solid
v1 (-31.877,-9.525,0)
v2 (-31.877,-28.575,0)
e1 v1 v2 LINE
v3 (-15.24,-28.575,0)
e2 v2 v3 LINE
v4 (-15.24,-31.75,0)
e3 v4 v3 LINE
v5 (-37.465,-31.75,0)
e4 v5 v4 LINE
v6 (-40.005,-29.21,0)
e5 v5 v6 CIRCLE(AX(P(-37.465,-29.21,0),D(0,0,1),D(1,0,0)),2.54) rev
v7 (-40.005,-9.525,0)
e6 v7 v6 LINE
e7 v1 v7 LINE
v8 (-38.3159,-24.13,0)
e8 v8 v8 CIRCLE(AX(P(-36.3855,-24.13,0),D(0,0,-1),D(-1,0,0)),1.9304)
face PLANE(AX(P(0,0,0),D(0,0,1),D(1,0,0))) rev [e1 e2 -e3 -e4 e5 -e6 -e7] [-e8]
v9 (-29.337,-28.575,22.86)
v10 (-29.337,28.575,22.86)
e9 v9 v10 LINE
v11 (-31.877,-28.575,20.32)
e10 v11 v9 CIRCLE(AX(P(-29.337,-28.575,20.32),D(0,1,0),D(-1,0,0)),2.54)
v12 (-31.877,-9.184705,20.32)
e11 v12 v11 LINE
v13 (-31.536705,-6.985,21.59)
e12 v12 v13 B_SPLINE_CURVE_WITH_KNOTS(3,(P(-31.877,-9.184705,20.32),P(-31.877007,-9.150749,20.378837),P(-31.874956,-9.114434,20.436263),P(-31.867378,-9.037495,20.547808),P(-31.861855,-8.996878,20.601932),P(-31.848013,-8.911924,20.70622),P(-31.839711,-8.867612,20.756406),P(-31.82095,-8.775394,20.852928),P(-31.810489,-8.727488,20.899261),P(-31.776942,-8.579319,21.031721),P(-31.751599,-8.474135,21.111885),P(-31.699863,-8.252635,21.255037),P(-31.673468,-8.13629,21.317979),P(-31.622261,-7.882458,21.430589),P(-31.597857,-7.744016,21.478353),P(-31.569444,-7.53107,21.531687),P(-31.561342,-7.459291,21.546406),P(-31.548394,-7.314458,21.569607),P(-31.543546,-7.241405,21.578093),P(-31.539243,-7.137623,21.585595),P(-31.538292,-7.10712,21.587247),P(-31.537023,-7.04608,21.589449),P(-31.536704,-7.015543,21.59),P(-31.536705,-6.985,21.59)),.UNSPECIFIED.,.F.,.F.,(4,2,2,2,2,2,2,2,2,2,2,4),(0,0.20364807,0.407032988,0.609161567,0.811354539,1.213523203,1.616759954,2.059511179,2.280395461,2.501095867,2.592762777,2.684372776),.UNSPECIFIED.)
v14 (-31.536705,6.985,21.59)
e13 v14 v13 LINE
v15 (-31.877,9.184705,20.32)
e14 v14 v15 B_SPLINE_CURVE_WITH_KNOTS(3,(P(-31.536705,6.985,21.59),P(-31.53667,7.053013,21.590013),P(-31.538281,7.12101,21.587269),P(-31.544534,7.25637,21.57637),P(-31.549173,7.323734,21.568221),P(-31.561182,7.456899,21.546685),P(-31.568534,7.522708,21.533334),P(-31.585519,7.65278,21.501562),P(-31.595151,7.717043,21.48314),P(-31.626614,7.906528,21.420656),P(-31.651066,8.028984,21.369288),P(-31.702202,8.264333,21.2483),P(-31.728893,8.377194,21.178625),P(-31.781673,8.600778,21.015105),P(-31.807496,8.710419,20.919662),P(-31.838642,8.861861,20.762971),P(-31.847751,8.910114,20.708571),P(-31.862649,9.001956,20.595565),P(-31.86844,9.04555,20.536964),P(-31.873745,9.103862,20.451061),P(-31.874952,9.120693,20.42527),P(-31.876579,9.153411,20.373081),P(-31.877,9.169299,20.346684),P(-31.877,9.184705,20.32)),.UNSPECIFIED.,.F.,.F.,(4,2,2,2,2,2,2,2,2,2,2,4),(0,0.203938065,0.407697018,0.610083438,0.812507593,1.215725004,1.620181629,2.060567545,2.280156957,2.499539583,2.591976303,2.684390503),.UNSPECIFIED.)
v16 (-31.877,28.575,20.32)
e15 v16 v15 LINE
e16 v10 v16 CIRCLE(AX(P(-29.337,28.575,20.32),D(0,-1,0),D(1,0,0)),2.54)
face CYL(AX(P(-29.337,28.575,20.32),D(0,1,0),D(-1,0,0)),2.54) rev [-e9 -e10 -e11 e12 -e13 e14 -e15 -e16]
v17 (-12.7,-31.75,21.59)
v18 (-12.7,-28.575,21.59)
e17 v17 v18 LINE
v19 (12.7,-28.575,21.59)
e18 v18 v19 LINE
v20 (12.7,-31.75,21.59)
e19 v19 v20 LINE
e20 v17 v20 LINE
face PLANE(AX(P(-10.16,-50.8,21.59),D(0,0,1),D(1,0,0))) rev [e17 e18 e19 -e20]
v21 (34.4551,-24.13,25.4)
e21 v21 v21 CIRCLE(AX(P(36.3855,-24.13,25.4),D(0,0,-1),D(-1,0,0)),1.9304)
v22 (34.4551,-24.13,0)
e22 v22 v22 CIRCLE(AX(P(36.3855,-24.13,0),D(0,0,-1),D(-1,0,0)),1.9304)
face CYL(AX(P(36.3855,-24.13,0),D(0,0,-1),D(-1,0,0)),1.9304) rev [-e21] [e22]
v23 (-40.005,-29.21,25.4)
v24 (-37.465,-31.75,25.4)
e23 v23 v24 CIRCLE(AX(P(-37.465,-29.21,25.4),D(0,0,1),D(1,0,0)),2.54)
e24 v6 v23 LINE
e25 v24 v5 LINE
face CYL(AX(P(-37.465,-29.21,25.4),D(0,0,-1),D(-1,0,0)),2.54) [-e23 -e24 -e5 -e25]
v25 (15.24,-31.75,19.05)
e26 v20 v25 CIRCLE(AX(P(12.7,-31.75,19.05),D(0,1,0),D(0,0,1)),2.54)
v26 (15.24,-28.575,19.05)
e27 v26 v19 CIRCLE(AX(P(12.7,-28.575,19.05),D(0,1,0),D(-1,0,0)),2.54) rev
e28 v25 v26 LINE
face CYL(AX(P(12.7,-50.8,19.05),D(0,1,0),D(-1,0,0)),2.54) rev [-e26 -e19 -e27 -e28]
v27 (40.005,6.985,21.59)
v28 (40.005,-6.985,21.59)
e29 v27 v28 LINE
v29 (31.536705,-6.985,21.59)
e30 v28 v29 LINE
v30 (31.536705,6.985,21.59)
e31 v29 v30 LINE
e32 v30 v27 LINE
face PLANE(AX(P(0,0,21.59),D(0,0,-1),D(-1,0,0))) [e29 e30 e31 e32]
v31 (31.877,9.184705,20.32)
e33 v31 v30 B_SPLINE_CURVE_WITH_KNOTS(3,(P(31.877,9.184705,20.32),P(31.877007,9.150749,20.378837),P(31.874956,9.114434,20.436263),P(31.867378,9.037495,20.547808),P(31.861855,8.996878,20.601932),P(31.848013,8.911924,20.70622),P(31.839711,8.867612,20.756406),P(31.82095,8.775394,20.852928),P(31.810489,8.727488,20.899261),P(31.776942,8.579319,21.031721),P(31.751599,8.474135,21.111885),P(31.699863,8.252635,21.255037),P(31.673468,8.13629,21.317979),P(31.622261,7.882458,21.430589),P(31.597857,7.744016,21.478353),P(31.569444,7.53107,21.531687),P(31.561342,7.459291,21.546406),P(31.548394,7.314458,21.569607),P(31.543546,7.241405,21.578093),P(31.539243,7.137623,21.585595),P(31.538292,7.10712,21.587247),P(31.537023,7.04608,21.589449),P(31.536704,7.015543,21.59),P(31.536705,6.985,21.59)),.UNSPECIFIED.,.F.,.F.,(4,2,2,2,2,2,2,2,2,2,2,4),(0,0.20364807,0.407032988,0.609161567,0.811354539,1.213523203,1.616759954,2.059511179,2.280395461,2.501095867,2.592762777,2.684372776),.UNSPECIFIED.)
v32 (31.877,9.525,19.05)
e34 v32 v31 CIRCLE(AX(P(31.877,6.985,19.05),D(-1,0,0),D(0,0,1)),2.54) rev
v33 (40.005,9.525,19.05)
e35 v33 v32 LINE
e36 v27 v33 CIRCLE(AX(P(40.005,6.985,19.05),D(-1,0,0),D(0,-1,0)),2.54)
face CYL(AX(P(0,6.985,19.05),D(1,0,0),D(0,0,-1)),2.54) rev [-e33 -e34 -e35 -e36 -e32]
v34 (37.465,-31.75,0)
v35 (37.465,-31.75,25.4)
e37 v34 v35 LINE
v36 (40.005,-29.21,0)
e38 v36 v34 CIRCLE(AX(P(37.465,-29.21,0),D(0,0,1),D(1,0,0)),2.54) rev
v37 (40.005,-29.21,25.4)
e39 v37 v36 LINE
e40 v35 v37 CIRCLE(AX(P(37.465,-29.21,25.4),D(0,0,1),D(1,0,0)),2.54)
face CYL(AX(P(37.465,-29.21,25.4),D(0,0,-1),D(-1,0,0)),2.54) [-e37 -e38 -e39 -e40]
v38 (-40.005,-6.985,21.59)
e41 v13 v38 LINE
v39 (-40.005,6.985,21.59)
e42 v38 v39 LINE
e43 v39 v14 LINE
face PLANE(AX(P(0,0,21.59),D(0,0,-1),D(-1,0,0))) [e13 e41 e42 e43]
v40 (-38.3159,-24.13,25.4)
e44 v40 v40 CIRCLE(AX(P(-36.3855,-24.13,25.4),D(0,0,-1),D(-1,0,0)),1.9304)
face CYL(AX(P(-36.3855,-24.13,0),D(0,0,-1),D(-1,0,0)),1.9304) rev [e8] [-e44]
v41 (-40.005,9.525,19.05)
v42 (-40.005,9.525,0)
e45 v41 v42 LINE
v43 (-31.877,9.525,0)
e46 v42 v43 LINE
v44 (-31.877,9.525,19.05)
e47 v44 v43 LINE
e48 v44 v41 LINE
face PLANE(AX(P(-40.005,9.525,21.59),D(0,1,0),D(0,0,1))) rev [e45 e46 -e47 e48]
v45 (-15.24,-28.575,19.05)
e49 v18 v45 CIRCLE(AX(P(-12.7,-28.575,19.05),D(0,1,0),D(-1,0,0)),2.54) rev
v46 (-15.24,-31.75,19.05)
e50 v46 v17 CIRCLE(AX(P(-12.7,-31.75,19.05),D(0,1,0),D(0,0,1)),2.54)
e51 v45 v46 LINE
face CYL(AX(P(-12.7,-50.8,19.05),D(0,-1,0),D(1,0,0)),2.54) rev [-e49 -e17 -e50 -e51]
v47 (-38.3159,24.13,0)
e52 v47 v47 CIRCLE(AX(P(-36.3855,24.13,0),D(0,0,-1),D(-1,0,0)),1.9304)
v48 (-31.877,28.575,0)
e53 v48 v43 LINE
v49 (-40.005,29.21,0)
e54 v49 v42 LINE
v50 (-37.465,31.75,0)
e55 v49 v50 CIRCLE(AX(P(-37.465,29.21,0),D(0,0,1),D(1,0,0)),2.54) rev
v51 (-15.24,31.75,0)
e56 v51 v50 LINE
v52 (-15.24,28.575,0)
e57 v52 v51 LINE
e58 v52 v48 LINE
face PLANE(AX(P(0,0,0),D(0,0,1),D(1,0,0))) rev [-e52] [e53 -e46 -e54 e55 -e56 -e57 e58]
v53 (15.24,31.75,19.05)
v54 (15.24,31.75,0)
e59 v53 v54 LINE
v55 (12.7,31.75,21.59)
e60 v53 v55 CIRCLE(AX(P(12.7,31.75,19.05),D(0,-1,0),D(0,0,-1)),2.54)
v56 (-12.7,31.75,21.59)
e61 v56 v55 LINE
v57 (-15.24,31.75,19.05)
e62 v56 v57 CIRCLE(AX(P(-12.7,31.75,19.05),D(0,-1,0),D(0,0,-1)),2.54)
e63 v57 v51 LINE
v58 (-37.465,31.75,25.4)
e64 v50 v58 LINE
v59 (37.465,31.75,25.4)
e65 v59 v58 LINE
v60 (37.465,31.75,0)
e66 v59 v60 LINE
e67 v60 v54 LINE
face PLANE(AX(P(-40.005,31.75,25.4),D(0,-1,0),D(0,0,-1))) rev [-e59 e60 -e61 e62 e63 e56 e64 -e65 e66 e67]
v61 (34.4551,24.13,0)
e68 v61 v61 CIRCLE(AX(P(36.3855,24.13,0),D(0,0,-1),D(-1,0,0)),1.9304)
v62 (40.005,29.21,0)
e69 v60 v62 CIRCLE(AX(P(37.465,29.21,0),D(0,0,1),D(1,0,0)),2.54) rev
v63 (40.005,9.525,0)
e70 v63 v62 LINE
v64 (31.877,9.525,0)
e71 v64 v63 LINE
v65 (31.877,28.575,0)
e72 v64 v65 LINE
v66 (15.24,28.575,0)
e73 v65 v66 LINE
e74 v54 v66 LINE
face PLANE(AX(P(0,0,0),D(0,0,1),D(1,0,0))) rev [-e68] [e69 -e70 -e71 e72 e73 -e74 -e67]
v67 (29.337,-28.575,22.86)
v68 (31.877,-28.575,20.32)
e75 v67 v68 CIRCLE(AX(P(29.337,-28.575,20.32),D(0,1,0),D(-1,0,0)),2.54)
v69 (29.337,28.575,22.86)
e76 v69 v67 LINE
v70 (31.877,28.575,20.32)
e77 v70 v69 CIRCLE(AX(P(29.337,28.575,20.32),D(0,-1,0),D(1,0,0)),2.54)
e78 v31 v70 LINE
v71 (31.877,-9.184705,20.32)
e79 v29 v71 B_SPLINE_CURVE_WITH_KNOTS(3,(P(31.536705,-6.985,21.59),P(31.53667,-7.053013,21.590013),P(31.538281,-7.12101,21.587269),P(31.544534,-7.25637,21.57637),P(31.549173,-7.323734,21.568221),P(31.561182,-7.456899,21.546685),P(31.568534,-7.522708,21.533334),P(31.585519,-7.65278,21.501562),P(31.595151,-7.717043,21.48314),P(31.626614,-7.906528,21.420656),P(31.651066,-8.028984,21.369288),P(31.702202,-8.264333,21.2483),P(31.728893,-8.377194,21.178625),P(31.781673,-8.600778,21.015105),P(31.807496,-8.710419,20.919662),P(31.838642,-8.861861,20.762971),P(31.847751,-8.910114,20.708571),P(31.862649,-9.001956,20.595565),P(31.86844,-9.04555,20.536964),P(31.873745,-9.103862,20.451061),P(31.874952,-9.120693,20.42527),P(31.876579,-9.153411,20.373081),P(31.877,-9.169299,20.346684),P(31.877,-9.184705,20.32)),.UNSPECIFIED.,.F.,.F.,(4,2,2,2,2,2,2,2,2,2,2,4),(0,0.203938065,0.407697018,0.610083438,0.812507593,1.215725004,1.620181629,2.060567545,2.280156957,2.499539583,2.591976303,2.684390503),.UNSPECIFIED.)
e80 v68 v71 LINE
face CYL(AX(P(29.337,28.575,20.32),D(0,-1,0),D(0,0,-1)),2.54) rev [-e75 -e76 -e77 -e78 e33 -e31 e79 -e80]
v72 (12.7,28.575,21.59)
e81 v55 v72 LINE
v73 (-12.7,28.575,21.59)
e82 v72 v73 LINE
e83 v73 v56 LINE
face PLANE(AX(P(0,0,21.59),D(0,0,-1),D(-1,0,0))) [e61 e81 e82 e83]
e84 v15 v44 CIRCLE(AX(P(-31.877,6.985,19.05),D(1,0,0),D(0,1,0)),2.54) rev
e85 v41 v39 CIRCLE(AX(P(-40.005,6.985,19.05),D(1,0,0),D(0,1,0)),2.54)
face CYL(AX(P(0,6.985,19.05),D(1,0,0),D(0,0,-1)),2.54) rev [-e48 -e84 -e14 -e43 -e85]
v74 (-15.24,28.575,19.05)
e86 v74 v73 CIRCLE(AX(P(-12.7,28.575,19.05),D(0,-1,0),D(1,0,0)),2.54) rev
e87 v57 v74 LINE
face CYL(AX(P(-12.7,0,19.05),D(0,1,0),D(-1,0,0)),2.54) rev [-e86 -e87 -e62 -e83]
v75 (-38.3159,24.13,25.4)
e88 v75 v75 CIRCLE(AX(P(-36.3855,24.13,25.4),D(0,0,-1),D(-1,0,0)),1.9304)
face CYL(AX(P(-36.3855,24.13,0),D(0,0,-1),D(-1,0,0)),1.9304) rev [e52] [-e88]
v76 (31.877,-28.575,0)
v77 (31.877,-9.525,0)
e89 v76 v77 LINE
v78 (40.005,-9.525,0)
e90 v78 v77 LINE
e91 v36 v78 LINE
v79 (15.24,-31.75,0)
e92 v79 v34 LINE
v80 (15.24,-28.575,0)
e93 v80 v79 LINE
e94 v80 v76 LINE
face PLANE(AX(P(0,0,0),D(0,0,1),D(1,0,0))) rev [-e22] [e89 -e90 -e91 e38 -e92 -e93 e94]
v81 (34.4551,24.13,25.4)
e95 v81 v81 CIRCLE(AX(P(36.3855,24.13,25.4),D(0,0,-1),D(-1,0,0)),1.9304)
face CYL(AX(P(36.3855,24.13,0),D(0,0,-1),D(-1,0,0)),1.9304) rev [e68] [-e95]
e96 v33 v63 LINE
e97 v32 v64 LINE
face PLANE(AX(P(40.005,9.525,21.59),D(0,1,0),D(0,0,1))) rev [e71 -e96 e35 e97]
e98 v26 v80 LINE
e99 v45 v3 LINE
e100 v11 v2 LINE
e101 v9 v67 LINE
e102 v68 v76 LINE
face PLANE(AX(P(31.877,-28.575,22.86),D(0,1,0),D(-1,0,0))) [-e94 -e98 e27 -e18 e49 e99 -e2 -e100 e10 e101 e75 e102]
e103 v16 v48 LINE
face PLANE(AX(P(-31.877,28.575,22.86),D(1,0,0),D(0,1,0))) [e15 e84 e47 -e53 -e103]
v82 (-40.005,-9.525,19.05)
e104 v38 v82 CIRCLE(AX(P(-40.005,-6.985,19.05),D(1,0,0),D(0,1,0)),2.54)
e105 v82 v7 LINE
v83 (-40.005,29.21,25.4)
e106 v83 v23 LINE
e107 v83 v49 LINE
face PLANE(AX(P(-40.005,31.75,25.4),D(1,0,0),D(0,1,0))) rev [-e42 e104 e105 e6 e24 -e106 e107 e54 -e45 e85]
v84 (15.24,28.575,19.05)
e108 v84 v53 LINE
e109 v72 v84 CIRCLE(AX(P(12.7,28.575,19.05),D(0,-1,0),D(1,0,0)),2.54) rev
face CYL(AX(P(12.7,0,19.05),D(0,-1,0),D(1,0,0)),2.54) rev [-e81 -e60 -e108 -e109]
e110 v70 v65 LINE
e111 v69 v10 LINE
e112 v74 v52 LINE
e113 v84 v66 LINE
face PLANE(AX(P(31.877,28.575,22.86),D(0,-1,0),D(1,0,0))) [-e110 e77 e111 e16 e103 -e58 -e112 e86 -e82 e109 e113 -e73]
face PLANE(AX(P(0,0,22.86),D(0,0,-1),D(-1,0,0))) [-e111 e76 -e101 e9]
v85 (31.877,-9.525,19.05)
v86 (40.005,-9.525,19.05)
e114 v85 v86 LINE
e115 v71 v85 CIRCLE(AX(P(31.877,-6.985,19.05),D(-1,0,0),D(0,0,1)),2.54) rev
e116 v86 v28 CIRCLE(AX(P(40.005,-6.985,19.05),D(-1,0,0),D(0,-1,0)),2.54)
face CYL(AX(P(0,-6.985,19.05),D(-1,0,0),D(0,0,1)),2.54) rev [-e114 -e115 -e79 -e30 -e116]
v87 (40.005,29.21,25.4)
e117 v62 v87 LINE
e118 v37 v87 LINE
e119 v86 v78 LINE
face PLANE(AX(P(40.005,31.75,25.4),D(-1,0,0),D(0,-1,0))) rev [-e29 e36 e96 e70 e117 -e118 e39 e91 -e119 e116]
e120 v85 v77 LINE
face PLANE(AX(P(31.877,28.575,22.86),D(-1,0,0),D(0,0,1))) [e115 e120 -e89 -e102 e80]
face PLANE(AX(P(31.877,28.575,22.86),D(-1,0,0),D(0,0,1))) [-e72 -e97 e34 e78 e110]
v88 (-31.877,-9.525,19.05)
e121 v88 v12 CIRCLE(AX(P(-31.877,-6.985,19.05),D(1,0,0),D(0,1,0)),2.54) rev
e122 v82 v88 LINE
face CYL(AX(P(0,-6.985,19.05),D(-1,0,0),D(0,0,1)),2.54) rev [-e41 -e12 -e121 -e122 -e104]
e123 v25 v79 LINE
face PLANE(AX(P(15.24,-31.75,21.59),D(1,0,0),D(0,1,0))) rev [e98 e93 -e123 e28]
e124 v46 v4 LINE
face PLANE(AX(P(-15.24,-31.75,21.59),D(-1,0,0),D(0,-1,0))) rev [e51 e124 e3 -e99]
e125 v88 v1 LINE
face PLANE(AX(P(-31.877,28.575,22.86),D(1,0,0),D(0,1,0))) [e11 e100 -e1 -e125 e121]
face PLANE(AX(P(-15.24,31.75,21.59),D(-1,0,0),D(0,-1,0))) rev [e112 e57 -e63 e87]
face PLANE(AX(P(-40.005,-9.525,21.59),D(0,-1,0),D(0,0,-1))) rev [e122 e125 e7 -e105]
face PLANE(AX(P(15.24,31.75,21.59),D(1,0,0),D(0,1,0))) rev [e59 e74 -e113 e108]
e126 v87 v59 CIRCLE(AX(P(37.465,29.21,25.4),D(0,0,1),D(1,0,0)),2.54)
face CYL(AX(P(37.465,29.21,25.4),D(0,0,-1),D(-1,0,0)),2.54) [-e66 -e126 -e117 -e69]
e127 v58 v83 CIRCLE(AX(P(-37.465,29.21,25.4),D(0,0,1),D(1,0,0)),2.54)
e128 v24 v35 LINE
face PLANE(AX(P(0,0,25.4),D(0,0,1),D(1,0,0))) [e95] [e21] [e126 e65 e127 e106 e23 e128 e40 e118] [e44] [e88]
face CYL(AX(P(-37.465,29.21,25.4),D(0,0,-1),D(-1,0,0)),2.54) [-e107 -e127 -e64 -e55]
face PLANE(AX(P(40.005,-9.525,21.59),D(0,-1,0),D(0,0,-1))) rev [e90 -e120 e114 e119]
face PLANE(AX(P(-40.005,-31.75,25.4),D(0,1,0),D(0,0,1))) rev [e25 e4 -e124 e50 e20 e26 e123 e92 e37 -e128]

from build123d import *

# Parameters (mm, degrees)
SKETCH1_W             = 80.01
SKETCH1_H             = 63.5
BOSS_EXTRUDE1_DEPTH   = 25.4
SKETCH2_W             = 63.754
SKETCH2_H             = 57.15
CUT_EXTRUDE1_DEPTH    = 22.86
F_8_CLEARANCE_HOLE1_D = 3.8608
SKETCH13_W            = 20.32
SKETCH13_H            = 21.59
CUT_EXTRUDE3_DEPTH    = 50.8
SKETCH14_W            = 8.128
SKETCH14_H            = 19.05
CUT_EXTRUDE4_DEPTH    = 21.59
SKETCH15_W            = 30.48
SKETCH15_H            = 3.175
CUT_EXTRUDE5_DEPTH    = 21.59
FILLET1_R             = 2.54
FILLET2_R             = 2.54
FILLET3_R             = 2.54


with BuildPart() as part:
    # Sketch1 → Boss-Extrude1 (new body)
    with BuildSketch(Plane.XY):
        Rectangle(SKETCH1_W, SKETCH1_H)
    extrude(amount=BOSS_EXTRUDE1_DEPTH)

    # Sketch2 → Cut-Extrude1 (cut)
    with BuildSketch(Plane.XY):
        Rectangle(SKETCH2_W, SKETCH2_H)
    extrude(amount=CUT_EXTRUDE1_DEPTH, mode=Mode.SUBTRACT)

    # #8 Clearance Hole1 (through all)
    with Locations(Plane(origin=(0, 0, 0), x_dir=(-1, 0, 0), z_dir=(0, 0, -1))):
        with Locations((-36.3855, -24.13), (-36.3855, 24.13), (36.3855, 24.13), (36.3855, -24.13)):
            Hole(F_8_CLEARANCE_HOLE1_D / 2)

    # Sketch13 → Cut-Extrude3 (cut)
    with BuildSketch(Plane(origin=(0, 0, 0), x_dir=(1, 0, 0), z_dir=(0, 1, 0))):
        with Locations((0, -10.795)):
            Rectangle(SKETCH13_W, SKETCH13_H)
    extrude(amount=-CUT_EXTRUDE3_DEPTH, mode=Mode.SUBTRACT)

    # Sketch14 → Cut-Extrude4 (cut)
    with BuildSketch(Plane(origin=(0, 0, 0), x_dir=(-1, 0, 0), z_dir=(0, 0, -1))):
        with Locations((-35.941, 0)):
            Rectangle(SKETCH14_W, SKETCH14_H)
        with Locations((35.941, 0)):
            Rectangle(SKETCH14_W, SKETCH14_H)
    extrude(amount=-CUT_EXTRUDE4_DEPTH, mode=Mode.SUBTRACT)

    # Sketch15 → Cut-Extrude5 (cut)
    with BuildSketch(Plane(origin=(0, 0, 0), x_dir=(-1, 0, 0), z_dir=(0, 0, -1))):
        with Locations((0, 30.1625)):
            Rectangle(SKETCH15_W, SKETCH15_H)
        with Locations((0, -30.1625)):
            Rectangle(SKETCH15_W, SKETCH15_H)
    extrude(amount=-CUT_EXTRUDE5_DEPTH, mode=Mode.SUBTRACT)

    # Fillet1
    # the kernel refuses this fillet: 2.54 mm, written as the material it adds along each edge
    with BuildSketch(Plane(origin=(31.877, -28.575, 22.86), x_dir=(0, 0, -1), z_dir=(0, 1, 0))) as fillet1_piece_1_section:
        with BuildLine():
            CenterArc((FILLET1_R, FILLET1_R), FILLET1_R, 180, 90)
            Line((0, FILLET1_R), (0, 0))
            Line((0, 0), (FILLET1_R, 0))
        make_face()
    fillet1_piece_1 = extrude(amount=63.5, mode=Mode.PRIVATE)
    fillet1_piece_1 = split(fillet1_piece_1, bisect_by=Plane(origin=(31.776201135, -9.525, 21.276910424), z_dir=(0, -1, 0)), keep=Keep.TOP, mode=Mode.PRIVATE)
    add(fillet1_piece_1)
    with BuildSketch(Plane(origin=(31.877, -34.925, 22.86), x_dir=(0, 0, -1), z_dir=(0, 1, 0))) as fillet1_piece_2_section:
        with BuildLine():
            CenterArc((FILLET1_R, FILLET1_R), FILLET1_R, 180, 90)
            Line((0, FILLET1_R), (0, 0))
            Line((0, 0), (FILLET1_R, 0))
        make_face()
    fillet1_piece_2 = extrude(amount=63.5, mode=Mode.PRIVATE)
    fillet1_piece_2 = split(fillet1_piece_2, bisect_by=Plane(origin=(31.257176883, 0, 21.59), z_dir=(0, 0, 1)), keep=Keep.TOP, mode=Mode.PRIVATE)
    fillet1_piece_2 = split(fillet1_piece_2, bisect_by=Plane(origin=(31.257176883, -9.525, 22.406874338), z_dir=(0, 1, 0)), keep=Keep.TOP, mode=Mode.PRIVATE)
    add(fillet1_piece_2)
    with BuildSketch(Plane(origin=(31.877, -34.925, 22.86), x_dir=(0, 0, -1), z_dir=(0, 1, 0))) as fillet1_piece_3_section:
        with BuildLine():
            CenterArc((FILLET1_R, FILLET1_R), FILLET1_R, 180, 90)
            Line((0, FILLET1_R), (0, 0))
            Line((0, 0), (FILLET1_R, 0))
        make_face()
    fillet1_piece_3 = extrude(amount=63.5, mode=Mode.PRIVATE)
    fillet1_piece_3 = split(fillet1_piece_3, bisect_by=Plane(origin=(31.776201135, 9.525, 21.276910424), z_dir=(0, 1, 0)), keep=Keep.TOP, mode=Mode.PRIVATE)
    add(fillet1_piece_3)
    with BuildSketch(Plane(origin=(-31.877, 28.575, 22.86), x_dir=(1, 0, 0), z_dir=(0, -1, 0))) as fillet1_piece_4_section:
        with BuildLine():
            CenterArc((FILLET1_R, -FILLET1_R), FILLET1_R, 90, 90)
            Line((0, -FILLET1_R), (0, 0))
            Line((0, 0), (FILLET1_R, 0))
        make_face()
    fillet1_piece_4 = extrude(amount=57.15, mode=Mode.PRIVATE)
    fillet1_piece_4 = split(fillet1_piece_4, bisect_by=Plane(origin=(-31.257176883, 19.05, 21.59), z_dir=(0, 0, 1)), keep=Keep.TOP, mode=Mode.PRIVATE)
    add(fillet1_piece_4)
    with BuildSketch(Plane(origin=(-31.877, 28.575, 22.86), x_dir=(1, 0, 0), z_dir=(0, -1, 0))) as fillet1_piece_5_section:
        with BuildLine():
            CenterArc((FILLET1_R, -FILLET1_R), FILLET1_R, 90, 90)
            Line((0, -FILLET1_R), (0, 0))
            Line((0, 0), (FILLET1_R, 0))
        make_face()
    fillet1_piece_5 = extrude(amount=63.5, mode=Mode.PRIVATE)
    fillet1_piece_5 = split(fillet1_piece_5, bisect_by=Plane(origin=(-31.776201135, 9.525, 21.276910424), z_dir=(0, 1, 0)), keep=Keep.TOP, mode=Mode.PRIVATE)
    add(fillet1_piece_5)
    with BuildSketch(Plane(origin=(-31.877, 34.925, 22.86), x_dir=(1, 0, 0), z_dir=(0, -1, 0))) as fillet1_piece_6_section:
        with BuildLine():
            CenterArc((FILLET1_R, -FILLET1_R), FILLET1_R, 90, 90)
            Line((0, -FILLET1_R), (0, 0))
            Line((0, 0), (FILLET1_R, 0))
        make_face()
    fillet1_piece_6 = extrude(amount=63.5, mode=Mode.PRIVATE)
    fillet1_piece_6 = split(fillet1_piece_6, bisect_by=Plane(origin=(-31.776201135, -9.525, 21.276910424), z_dir=(0, -1, 0)), keep=Keep.TOP, mode=Mode.PRIVATE)
    add(fillet1_piece_6)

    # Fillet2
    fillet2_edges = [part.edges().sort_by_distance(p)[0] for p in [
        (-15.24, 30.1625, 21.59),
        (15.24, 30.1625, 21.59),
        (15.24, -30.1625, 21.59),
        (-15.24, -30.1625, 21.59),
        (-35.770852263, 9.525, 21.59),
        (-35.770852263, -9.525, 21.59),
        (35.770852263, -9.525, 21.59),
        (35.770852263, 9.525, 21.59),
    ]]
    fillet(fillet2_edges, radius=FILLET2_R)

    # Fillet3
    fillet3_edges = [part.edges().sort_by_distance(p)[0] for p in [
        (-40.005, 31.75, 12.7),
        (40.005, 31.75, 12.7),
        (40.005, -31.75, 12.7),
        (-40.005, -31.75, 12.7),
    ]]
    fillet(fillet3_edges, radius=FILLET3_R)


solid = part.part
